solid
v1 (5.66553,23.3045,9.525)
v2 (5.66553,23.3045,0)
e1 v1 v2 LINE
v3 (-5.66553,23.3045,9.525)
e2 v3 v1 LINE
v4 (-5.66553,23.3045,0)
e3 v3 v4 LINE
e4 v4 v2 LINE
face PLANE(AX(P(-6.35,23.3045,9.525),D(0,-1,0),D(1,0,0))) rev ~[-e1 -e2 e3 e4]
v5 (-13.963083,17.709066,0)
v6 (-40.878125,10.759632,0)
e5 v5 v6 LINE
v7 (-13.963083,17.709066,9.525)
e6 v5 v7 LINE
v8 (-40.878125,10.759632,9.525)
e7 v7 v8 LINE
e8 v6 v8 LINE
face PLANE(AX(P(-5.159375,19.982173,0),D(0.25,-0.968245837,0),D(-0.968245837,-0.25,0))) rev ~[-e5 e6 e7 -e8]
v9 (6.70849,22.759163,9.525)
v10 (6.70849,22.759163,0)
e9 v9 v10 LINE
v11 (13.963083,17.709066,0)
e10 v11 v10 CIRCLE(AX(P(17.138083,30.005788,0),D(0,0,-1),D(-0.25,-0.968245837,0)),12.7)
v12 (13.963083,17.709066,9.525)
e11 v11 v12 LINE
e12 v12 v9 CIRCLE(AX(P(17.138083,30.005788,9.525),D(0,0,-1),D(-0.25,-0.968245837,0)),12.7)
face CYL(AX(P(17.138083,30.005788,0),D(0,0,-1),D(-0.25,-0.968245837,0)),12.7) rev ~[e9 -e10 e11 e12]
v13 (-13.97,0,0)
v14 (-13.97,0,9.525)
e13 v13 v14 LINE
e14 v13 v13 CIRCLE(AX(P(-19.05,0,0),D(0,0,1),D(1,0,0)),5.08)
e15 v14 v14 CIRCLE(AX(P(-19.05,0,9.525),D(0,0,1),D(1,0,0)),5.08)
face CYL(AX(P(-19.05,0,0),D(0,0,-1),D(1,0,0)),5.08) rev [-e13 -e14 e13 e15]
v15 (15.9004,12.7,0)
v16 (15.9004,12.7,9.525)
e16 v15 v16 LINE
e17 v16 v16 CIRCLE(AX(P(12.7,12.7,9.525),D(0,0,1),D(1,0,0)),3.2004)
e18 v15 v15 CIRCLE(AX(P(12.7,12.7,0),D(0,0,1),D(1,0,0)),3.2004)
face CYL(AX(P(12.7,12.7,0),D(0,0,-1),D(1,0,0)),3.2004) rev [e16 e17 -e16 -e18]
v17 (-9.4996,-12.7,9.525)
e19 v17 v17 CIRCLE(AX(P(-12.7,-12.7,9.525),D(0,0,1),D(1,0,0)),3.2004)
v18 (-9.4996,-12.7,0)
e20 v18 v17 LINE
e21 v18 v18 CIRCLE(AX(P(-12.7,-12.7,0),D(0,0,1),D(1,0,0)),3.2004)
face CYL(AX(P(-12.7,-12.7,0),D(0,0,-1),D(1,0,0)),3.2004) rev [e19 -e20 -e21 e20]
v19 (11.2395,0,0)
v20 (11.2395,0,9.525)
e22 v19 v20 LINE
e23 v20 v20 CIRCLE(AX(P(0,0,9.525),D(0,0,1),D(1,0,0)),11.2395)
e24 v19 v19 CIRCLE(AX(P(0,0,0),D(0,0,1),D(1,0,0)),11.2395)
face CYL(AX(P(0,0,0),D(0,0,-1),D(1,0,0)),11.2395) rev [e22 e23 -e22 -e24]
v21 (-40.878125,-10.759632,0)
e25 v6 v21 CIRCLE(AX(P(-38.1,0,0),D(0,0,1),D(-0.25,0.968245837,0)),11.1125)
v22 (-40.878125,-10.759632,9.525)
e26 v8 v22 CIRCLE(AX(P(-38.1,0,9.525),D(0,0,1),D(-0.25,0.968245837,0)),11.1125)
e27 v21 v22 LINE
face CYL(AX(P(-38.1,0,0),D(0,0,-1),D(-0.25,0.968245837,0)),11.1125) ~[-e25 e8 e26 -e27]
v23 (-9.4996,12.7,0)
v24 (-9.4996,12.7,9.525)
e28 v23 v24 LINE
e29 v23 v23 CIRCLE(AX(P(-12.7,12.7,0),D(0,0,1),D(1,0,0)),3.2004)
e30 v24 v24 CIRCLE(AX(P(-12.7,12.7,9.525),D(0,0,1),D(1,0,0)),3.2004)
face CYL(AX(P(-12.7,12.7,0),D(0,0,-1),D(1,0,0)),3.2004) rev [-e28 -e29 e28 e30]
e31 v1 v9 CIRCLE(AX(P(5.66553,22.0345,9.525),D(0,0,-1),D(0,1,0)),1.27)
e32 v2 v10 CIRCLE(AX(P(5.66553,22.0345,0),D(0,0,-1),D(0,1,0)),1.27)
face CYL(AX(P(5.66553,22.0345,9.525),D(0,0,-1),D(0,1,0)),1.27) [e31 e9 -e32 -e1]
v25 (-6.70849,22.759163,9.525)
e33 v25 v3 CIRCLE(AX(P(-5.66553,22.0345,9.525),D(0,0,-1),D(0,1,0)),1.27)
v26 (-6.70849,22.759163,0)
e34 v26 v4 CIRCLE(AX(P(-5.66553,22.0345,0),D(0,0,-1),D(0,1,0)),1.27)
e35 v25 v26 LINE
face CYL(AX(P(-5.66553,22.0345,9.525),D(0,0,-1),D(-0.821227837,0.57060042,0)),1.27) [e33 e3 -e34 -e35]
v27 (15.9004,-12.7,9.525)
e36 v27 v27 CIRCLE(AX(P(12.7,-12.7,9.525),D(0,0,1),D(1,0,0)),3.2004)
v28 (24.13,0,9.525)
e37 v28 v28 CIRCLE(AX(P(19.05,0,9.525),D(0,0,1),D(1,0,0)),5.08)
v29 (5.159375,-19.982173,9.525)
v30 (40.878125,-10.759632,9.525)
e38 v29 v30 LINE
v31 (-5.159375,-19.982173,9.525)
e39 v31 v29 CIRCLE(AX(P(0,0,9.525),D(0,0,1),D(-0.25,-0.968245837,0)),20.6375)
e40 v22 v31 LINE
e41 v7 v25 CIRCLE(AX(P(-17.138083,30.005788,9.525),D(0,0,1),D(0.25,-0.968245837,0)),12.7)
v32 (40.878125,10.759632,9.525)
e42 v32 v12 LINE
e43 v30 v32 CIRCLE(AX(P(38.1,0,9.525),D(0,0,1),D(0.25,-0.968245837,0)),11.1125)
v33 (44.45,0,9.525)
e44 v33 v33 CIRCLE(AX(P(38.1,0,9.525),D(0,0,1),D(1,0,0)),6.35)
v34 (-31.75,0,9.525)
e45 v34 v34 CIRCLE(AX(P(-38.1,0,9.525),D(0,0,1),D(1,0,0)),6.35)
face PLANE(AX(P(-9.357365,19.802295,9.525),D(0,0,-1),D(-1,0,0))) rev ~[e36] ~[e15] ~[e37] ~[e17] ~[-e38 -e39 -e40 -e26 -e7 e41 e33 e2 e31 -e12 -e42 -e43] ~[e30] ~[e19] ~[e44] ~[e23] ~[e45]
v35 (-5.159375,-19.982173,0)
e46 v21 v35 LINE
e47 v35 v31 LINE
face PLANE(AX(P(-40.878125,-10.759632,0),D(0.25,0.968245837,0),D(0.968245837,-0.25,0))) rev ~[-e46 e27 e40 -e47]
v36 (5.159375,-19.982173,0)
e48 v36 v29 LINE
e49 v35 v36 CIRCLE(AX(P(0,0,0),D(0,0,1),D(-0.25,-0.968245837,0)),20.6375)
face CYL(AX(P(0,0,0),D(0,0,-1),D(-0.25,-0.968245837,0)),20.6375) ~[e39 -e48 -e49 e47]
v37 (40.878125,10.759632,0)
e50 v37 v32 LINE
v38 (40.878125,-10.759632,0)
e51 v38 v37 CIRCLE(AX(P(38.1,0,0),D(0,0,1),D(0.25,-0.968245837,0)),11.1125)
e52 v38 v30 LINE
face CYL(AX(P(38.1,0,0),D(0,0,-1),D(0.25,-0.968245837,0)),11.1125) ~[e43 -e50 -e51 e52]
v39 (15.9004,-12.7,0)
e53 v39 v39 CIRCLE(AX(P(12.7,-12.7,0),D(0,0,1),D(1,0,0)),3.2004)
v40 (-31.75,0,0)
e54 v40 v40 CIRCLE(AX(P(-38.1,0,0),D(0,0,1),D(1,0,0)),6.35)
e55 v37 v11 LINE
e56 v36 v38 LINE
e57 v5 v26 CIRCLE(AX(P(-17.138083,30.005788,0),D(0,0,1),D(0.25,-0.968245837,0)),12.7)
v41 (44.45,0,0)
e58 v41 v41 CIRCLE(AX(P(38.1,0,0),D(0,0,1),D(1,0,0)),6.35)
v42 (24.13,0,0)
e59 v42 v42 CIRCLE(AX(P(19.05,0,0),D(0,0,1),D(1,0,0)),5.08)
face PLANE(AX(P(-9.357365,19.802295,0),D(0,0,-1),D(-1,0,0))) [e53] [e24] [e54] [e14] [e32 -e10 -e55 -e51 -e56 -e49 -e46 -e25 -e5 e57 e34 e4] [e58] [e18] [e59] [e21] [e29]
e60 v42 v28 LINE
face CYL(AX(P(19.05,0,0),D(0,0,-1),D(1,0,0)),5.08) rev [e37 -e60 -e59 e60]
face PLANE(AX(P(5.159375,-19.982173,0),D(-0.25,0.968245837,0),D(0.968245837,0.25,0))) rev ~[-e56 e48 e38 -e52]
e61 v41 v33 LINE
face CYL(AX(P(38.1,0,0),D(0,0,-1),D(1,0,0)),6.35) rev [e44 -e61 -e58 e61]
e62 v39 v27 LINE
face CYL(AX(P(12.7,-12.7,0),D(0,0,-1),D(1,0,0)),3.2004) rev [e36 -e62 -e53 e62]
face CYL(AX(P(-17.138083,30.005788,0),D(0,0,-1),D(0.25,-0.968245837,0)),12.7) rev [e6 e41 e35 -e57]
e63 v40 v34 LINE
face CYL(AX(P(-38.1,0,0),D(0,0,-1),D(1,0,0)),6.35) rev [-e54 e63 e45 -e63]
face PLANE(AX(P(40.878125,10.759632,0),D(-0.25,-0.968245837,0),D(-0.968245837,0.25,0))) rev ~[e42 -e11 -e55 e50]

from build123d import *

# Parameters (mm, degrees)
F0_R        = 3.2004
F0_R_2      = 6.35
F0_R_3      = 5.08
F0_R_4      = 11.2395
F1_DEPTH    = 9.525
F2_W        = 12.7
F2_H        = 5.1071889116
F3_DEPTH    = 9.525
F4_T1_DEPTH = 9.525
F5_R        = 1.27


# Not quite as in the source:
# - a fillet or chamfer that OpenCascade refuses, or shapes differently, is made with other operations: its cross-section is extruded or revolved along the edge and cut away or added


with BuildPart() as f1:
    # F0 (on Top) → F1 (new body)
    with BuildSketch(Plane.XY):
        with BuildLine():
            Line((-5.159375, 19.9821734518), (-40.878125, 10.7596318587))
            ThreePointArc((-40.878125, 10.7596318587), (-49.2125, 0), (-40.878125, -10.7596318587))
            Line((-40.878125, -10.7596318587), (-5.159375, -19.9821734518))
            ThreePointArc((-5.159375, -19.9821734518), (0, -20.6375), (5.159375, -19.9821734518))
            Line((5.159375, -19.9821734518), (40.878125, -10.7596318587))
            ThreePointArc((40.878125, -10.7596318587), (49.2125, 0), (40.878125, 10.7596318587))
            Line((40.878125, 10.7596318587), (5.159375, 19.9821734518))
            ThreePointArc((5.159375, 19.9821734518), (0, 20.6375), (-5.159375, 19.9821734518))
        make_face()
        with Locations((-12.7, -12.7)):
            Circle(F0_R, mode=Mode.SUBTRACT)
        with Locations((12.7, -12.7)):
            Circle(F0_R, mode=Mode.SUBTRACT)
        with Locations((-38.1, 0)):
            Circle(F0_R_2, mode=Mode.SUBTRACT)
        with Locations((-19.05, 0)):
            Circle(F0_R_3, mode=Mode.SUBTRACT)
        with Locations((-12.7, 12.7)):
            Circle(F0_R, mode=Mode.SUBTRACT)
        Circle(F0_R_4, mode=Mode.SUBTRACT)
        with Locations((19.05, 0)):
            Circle(F0_R_3, mode=Mode.SUBTRACT)
        with Locations((38.1, 0)):
            Circle(F0_R_2, mode=Mode.SUBTRACT)
        with Locations((12.7, 12.7)):
            Circle(F0_R, mode=Mode.SUBTRACT)
    extrude(amount=F1_DEPTH)

    # F2 (on face) → F3 (join, through all)
    with BuildSketch(Plane.XY.offset(9.525)):
        with Locations((0, 20.7509055442)):
            Rectangle(F2_W, F2_H)
    extrude(amount=-F3_DEPTH)

    # F4: fillet of radius 12.7 on 2 edges, made by hand

    # F4_s2 → F4_t1 (join)
    with BuildSketch(Plane.XY):
        with BuildLine():
            ThreePointArc((-13.9630832797, 17.7090657484), (-9.6168370541, 19.7724670423), (-6.35, 23.3045))
            Line((-6.35, 23.3045), (-6.35, 19.6747553987))
            Line((-6.35, 19.6747553987), (-13.9630832797, 17.7090657484))
        make_face()
        with BuildLine():
            ThreePointArc((13.9630832797, 17.7090657484), (9.6168370541, 19.7724670423), (6.35, 23.3045))
            Line((6.35, 23.3045), (6.35, 19.6747553987))
            Line((6.35, 19.6747553987), (13.9630832797, 17.7090657484))
        make_face()
    extrude(amount=F4_T1_DEPTH)

    # F5
    f5_edges = [f1.edges().sort_by_distance(p)[0] for p in [
        (-6.35, 23.3045, 4.7625),
        (6.35, 23.3045, 4.7625),
    ]]
    fillet(f5_edges, radius=F5_R)


solid = f1.part
